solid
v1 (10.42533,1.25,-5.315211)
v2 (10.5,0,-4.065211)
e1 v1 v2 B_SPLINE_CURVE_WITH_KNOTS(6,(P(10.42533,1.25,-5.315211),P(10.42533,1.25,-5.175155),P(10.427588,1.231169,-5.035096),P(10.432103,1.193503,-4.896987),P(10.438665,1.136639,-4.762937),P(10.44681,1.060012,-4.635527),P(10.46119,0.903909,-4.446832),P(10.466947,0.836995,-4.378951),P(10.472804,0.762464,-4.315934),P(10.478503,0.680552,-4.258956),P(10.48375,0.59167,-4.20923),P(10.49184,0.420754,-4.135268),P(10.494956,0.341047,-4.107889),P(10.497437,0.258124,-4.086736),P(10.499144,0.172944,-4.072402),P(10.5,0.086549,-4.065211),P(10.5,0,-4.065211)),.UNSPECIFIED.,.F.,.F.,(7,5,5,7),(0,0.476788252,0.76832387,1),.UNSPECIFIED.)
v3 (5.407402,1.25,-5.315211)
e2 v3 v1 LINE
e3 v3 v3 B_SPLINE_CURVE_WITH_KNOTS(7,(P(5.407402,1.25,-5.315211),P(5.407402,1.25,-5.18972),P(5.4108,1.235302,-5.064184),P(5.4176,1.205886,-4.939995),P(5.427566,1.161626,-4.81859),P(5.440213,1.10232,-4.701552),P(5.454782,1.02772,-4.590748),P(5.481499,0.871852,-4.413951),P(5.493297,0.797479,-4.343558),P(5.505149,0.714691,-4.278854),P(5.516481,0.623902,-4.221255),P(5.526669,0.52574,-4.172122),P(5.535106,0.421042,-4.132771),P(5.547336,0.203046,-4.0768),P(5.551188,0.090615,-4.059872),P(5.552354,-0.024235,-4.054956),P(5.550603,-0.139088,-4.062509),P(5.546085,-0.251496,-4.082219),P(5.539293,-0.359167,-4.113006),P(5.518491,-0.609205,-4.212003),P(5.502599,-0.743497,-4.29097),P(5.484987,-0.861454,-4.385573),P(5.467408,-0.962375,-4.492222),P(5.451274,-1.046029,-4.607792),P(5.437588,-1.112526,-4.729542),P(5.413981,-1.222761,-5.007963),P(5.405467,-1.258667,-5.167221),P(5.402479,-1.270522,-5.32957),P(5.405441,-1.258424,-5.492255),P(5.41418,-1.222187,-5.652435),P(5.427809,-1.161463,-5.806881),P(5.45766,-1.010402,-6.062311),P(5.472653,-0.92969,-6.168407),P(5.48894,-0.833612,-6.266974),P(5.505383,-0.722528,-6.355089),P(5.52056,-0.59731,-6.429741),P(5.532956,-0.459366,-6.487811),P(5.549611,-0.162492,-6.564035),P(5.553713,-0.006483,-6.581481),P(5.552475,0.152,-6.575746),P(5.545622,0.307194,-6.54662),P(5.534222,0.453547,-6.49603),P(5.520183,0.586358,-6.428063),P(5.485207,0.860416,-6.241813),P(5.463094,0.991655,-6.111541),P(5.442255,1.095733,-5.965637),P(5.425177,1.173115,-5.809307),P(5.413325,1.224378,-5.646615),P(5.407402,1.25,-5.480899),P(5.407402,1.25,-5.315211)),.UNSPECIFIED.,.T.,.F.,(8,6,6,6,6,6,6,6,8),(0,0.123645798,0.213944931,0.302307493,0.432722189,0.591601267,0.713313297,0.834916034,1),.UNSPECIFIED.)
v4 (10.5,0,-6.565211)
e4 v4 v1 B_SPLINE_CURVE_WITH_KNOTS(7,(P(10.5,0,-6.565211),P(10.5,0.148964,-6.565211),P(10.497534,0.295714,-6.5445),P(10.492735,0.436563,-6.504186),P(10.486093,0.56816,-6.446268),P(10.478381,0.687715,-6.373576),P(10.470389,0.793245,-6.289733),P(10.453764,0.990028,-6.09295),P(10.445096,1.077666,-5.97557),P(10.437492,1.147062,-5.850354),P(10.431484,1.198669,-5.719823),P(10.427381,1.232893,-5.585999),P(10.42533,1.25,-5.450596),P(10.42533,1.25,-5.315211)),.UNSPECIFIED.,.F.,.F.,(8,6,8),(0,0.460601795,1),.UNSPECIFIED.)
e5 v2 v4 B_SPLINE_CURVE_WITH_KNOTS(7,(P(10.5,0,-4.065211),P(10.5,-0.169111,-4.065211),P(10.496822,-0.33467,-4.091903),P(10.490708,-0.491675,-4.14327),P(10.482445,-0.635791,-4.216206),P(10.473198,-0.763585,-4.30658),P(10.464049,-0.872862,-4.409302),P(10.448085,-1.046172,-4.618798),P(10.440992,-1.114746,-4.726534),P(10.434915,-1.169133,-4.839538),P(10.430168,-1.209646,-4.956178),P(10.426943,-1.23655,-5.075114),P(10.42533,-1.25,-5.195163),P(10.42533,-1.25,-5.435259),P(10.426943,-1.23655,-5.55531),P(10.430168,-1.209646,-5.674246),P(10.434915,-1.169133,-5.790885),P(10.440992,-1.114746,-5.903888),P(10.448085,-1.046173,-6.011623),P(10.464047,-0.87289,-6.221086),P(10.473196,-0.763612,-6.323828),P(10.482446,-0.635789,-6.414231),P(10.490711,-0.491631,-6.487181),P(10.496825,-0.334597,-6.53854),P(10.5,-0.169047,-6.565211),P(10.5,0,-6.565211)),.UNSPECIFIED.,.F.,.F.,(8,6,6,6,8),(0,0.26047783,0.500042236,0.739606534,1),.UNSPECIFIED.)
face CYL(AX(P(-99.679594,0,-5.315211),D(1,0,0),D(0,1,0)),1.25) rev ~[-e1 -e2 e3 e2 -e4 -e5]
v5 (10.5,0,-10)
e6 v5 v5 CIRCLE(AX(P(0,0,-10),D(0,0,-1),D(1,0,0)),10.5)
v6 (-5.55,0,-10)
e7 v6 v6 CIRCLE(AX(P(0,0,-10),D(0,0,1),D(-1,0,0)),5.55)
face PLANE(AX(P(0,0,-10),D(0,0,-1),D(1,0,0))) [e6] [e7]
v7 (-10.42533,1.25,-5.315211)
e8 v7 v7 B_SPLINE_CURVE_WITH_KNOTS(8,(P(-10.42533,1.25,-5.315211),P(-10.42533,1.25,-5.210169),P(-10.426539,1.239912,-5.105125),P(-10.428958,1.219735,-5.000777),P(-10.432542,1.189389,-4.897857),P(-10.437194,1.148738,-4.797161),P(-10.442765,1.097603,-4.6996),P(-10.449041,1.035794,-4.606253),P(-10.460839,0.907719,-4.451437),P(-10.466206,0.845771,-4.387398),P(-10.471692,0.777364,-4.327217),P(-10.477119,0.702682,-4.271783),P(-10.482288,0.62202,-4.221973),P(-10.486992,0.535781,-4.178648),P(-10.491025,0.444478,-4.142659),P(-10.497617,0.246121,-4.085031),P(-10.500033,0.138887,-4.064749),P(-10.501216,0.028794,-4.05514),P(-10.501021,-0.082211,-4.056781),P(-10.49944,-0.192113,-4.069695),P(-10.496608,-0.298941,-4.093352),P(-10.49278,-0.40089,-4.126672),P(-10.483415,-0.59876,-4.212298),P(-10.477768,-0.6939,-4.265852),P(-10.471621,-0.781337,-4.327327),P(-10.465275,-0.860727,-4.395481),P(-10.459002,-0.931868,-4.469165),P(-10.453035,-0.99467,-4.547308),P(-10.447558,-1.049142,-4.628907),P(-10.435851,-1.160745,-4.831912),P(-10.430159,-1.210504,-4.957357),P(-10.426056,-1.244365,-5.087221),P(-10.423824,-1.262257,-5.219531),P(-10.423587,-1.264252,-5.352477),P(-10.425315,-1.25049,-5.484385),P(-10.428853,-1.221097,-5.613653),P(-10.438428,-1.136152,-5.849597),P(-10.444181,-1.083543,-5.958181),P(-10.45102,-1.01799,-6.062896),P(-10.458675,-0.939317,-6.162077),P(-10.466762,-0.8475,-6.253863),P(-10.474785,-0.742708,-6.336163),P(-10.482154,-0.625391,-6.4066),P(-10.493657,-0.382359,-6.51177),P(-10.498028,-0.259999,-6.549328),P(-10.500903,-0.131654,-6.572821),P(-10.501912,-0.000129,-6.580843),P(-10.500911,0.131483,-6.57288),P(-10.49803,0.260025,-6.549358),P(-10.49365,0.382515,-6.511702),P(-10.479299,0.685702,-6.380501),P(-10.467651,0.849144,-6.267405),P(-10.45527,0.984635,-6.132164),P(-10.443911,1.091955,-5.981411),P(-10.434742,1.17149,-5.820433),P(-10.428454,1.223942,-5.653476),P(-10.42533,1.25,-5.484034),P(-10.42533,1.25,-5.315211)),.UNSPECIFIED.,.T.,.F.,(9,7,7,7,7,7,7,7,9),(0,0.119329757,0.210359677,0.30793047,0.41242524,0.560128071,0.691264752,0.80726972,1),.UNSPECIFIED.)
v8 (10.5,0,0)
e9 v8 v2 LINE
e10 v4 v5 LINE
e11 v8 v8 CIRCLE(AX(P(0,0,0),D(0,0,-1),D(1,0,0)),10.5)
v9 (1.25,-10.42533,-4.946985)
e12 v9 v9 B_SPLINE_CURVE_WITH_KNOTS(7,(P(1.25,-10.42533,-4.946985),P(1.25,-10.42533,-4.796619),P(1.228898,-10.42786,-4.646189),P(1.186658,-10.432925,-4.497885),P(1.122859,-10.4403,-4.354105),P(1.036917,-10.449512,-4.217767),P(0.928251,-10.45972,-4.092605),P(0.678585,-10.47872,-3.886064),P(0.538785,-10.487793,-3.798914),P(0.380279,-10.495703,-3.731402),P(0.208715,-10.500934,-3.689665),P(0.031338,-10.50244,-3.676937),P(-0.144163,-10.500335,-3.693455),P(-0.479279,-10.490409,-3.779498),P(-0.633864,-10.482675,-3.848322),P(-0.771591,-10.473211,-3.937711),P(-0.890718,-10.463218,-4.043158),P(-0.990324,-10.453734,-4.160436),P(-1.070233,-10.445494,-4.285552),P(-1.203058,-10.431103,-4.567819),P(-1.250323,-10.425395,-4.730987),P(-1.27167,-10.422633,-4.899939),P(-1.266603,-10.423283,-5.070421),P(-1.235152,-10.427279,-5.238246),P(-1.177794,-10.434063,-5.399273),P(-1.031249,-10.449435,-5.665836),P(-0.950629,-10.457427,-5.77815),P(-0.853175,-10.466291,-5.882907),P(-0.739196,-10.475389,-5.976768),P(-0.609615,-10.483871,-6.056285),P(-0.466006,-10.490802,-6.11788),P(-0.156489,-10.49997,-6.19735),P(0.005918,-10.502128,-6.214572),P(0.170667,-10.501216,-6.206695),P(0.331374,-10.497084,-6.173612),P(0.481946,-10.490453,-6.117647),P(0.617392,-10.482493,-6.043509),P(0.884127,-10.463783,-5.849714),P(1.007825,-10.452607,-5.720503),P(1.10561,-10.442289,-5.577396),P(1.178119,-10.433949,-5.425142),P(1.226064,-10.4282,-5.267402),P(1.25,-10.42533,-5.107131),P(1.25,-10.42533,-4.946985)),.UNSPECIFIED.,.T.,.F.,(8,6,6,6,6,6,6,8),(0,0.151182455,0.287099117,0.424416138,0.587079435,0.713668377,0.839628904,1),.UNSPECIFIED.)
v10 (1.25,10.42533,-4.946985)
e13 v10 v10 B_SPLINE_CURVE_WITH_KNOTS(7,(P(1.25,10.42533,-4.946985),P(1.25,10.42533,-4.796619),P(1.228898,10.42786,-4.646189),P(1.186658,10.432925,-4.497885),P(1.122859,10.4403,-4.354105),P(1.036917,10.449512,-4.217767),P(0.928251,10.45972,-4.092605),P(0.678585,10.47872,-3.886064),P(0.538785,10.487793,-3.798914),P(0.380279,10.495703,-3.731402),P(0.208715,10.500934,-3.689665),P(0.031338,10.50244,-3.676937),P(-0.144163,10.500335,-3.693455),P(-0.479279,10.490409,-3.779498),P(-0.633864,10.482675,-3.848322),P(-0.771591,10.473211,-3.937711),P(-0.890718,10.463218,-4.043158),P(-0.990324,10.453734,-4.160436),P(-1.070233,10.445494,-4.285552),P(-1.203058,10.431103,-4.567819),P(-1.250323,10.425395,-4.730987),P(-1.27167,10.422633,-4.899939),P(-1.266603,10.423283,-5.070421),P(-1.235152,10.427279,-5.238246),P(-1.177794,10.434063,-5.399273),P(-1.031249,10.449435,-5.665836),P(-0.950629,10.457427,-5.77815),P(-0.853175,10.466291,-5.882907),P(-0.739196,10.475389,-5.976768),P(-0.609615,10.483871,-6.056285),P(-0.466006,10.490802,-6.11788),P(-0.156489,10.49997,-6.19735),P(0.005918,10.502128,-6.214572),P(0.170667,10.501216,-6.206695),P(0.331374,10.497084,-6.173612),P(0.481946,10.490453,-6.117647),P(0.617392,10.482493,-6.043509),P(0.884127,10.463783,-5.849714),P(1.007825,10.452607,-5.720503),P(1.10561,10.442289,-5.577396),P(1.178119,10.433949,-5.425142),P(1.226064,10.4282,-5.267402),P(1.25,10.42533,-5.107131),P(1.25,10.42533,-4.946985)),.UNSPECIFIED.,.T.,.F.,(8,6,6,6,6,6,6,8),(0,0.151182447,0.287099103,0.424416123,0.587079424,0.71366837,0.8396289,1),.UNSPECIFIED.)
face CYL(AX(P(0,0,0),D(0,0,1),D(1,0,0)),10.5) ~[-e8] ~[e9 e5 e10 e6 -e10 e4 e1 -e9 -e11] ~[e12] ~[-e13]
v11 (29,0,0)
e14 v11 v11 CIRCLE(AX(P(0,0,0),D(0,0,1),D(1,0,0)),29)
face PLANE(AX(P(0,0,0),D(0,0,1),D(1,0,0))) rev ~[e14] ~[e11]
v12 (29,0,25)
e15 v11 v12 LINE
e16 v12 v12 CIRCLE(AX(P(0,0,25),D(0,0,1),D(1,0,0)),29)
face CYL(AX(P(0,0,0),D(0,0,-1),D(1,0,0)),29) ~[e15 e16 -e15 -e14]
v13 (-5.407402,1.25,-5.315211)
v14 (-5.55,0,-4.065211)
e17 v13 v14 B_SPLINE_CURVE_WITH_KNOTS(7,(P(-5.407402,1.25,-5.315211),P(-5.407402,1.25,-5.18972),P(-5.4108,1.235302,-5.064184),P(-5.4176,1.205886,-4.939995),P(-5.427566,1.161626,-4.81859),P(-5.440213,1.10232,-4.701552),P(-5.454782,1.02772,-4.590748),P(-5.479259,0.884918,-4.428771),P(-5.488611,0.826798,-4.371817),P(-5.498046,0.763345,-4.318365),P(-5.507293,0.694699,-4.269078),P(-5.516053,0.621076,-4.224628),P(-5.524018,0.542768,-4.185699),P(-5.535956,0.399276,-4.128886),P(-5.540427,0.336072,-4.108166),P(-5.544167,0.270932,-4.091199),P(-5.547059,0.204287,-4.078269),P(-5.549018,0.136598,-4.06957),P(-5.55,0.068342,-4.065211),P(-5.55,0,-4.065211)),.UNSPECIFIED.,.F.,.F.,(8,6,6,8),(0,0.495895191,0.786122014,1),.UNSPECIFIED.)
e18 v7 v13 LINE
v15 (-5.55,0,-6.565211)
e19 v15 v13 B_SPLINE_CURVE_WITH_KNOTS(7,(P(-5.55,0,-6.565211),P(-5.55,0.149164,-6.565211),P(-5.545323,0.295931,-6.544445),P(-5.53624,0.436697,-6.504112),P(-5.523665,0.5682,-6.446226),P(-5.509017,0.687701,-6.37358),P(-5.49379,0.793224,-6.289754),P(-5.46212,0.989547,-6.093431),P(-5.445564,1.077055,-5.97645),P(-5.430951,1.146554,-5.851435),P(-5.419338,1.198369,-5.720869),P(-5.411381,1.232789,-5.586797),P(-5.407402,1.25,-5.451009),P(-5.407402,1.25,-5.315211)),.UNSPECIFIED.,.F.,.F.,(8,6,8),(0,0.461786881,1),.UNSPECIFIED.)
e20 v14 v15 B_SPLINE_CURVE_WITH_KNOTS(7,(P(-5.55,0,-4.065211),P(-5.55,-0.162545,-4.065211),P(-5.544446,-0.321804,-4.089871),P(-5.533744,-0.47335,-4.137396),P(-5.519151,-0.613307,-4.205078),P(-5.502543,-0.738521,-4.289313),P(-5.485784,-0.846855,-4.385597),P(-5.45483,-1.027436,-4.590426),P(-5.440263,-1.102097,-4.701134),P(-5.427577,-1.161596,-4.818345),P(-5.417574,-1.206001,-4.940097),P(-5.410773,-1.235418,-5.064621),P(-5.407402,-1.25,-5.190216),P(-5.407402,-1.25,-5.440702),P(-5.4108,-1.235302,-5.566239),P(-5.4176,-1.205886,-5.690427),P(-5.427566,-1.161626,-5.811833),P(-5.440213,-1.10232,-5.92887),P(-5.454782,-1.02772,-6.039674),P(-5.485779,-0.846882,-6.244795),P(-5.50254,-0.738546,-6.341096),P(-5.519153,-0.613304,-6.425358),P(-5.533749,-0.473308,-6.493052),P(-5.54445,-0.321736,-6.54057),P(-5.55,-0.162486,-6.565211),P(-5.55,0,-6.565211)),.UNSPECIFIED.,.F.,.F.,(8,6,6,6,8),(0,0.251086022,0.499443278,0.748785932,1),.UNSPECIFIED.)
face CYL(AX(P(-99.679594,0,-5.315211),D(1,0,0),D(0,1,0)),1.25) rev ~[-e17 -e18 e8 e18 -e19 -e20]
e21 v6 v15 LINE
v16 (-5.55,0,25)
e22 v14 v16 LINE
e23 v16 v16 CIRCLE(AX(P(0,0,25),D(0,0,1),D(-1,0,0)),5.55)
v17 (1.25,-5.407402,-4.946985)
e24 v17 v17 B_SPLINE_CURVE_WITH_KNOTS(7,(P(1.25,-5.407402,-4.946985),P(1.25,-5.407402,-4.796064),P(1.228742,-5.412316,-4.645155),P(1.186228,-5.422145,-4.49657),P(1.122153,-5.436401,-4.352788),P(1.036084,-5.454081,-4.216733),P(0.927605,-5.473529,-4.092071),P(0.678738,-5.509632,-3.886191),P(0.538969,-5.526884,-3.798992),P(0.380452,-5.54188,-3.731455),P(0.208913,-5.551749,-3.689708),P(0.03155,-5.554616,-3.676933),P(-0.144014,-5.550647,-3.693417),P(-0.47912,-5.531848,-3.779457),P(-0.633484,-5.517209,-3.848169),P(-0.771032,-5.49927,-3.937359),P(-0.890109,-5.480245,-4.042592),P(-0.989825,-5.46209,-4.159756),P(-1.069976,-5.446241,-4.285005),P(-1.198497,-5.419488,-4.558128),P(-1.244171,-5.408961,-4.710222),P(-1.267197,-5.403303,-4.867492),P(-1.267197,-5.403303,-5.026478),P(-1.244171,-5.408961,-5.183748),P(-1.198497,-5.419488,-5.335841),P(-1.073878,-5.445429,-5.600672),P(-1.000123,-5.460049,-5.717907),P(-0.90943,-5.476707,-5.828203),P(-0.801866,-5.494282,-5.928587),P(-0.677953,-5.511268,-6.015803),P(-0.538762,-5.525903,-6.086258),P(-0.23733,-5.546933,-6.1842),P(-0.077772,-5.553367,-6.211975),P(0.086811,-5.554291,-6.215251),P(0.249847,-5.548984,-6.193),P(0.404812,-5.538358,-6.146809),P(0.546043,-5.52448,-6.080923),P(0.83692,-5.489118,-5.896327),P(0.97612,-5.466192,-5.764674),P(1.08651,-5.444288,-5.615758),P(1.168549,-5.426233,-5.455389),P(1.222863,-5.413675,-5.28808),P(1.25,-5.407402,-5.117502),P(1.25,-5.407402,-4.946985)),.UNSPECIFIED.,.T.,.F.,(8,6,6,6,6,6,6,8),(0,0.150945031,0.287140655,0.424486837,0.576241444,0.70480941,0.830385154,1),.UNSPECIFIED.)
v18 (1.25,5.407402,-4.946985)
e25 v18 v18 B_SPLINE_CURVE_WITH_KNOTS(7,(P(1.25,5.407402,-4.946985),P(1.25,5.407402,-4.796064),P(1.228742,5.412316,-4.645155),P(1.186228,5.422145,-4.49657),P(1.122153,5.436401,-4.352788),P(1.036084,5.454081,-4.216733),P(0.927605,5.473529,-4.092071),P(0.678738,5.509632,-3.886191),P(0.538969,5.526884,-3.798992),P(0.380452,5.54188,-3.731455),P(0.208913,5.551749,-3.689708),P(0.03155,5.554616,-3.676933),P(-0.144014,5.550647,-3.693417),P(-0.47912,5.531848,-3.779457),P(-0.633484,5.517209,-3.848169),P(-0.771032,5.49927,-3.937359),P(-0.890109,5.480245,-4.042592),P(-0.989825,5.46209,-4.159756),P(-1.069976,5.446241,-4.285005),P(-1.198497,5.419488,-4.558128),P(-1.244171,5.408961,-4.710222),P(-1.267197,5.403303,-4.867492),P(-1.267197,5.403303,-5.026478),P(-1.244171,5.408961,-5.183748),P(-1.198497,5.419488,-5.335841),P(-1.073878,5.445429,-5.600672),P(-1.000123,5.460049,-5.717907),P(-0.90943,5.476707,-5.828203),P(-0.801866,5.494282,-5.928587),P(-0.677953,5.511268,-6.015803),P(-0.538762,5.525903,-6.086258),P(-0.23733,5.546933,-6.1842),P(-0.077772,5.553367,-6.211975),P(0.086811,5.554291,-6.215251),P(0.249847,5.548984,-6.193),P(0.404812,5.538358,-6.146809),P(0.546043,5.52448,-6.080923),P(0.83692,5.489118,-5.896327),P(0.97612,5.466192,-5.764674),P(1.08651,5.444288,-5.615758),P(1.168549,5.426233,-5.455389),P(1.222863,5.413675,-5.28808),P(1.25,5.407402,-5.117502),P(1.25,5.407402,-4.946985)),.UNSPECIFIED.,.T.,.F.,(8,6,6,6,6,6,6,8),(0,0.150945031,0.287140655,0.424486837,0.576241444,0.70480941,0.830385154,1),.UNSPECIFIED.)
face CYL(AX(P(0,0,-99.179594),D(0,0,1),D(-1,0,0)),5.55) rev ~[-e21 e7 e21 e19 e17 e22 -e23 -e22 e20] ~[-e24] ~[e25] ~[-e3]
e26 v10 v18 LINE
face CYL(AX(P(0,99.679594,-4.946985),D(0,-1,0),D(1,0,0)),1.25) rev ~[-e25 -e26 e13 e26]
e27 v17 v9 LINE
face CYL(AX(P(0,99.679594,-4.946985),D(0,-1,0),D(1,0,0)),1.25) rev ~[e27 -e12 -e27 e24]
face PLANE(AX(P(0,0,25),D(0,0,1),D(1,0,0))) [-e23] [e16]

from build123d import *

# Parameters (mm, degrees)
F0_R     = 29
F1_DEPTH = 25
F2_R     = 10.5
F3_DEPTH = 10
F5_D     = 11.1
F9_D     = 2.5
F13_D    = 2.5


with BuildPart() as f1:
    # F0 (on Top) → F1 (new body)
    with BuildSketch(Plane.XY):
        Circle(F0_R)
    extrude(amount=F1_DEPTH)

    # F2 (on face) → F3 (join)
    with BuildSketch(Plane(origin=(0, 0, 0), x_dir=(1, 0, 0), z_dir=(0, 0, -1))):
        Circle(F2_R)
    extrude(amount=F3_DEPTH)

    # F5 (through all)
    with Locations(Plane(origin=(0, 0, -10), x_dir=(1, 0, 0), z_dir=(0, 0, -1))):
        with Locations((0, 0)):
            Hole(F5_D / 2)

    # F9 (through all)
    with Locations(Plane(origin=(-10.5, 0, 0), x_dir=(0, -1, 0), z_dir=(-1, 0, 0))):
        with Locations((0, -5.3152111359)):
            Hole(F9_D / 2)

    # F13 (through all)
    with Locations(Plane(origin=(0, 10.5, 0), x_dir=(-1, 0, 0), z_dir=(0, 1, 0))):
        with Locations((0, -4.9469849671)):
            Hole(F13_D / 2)


solid = f1.part
